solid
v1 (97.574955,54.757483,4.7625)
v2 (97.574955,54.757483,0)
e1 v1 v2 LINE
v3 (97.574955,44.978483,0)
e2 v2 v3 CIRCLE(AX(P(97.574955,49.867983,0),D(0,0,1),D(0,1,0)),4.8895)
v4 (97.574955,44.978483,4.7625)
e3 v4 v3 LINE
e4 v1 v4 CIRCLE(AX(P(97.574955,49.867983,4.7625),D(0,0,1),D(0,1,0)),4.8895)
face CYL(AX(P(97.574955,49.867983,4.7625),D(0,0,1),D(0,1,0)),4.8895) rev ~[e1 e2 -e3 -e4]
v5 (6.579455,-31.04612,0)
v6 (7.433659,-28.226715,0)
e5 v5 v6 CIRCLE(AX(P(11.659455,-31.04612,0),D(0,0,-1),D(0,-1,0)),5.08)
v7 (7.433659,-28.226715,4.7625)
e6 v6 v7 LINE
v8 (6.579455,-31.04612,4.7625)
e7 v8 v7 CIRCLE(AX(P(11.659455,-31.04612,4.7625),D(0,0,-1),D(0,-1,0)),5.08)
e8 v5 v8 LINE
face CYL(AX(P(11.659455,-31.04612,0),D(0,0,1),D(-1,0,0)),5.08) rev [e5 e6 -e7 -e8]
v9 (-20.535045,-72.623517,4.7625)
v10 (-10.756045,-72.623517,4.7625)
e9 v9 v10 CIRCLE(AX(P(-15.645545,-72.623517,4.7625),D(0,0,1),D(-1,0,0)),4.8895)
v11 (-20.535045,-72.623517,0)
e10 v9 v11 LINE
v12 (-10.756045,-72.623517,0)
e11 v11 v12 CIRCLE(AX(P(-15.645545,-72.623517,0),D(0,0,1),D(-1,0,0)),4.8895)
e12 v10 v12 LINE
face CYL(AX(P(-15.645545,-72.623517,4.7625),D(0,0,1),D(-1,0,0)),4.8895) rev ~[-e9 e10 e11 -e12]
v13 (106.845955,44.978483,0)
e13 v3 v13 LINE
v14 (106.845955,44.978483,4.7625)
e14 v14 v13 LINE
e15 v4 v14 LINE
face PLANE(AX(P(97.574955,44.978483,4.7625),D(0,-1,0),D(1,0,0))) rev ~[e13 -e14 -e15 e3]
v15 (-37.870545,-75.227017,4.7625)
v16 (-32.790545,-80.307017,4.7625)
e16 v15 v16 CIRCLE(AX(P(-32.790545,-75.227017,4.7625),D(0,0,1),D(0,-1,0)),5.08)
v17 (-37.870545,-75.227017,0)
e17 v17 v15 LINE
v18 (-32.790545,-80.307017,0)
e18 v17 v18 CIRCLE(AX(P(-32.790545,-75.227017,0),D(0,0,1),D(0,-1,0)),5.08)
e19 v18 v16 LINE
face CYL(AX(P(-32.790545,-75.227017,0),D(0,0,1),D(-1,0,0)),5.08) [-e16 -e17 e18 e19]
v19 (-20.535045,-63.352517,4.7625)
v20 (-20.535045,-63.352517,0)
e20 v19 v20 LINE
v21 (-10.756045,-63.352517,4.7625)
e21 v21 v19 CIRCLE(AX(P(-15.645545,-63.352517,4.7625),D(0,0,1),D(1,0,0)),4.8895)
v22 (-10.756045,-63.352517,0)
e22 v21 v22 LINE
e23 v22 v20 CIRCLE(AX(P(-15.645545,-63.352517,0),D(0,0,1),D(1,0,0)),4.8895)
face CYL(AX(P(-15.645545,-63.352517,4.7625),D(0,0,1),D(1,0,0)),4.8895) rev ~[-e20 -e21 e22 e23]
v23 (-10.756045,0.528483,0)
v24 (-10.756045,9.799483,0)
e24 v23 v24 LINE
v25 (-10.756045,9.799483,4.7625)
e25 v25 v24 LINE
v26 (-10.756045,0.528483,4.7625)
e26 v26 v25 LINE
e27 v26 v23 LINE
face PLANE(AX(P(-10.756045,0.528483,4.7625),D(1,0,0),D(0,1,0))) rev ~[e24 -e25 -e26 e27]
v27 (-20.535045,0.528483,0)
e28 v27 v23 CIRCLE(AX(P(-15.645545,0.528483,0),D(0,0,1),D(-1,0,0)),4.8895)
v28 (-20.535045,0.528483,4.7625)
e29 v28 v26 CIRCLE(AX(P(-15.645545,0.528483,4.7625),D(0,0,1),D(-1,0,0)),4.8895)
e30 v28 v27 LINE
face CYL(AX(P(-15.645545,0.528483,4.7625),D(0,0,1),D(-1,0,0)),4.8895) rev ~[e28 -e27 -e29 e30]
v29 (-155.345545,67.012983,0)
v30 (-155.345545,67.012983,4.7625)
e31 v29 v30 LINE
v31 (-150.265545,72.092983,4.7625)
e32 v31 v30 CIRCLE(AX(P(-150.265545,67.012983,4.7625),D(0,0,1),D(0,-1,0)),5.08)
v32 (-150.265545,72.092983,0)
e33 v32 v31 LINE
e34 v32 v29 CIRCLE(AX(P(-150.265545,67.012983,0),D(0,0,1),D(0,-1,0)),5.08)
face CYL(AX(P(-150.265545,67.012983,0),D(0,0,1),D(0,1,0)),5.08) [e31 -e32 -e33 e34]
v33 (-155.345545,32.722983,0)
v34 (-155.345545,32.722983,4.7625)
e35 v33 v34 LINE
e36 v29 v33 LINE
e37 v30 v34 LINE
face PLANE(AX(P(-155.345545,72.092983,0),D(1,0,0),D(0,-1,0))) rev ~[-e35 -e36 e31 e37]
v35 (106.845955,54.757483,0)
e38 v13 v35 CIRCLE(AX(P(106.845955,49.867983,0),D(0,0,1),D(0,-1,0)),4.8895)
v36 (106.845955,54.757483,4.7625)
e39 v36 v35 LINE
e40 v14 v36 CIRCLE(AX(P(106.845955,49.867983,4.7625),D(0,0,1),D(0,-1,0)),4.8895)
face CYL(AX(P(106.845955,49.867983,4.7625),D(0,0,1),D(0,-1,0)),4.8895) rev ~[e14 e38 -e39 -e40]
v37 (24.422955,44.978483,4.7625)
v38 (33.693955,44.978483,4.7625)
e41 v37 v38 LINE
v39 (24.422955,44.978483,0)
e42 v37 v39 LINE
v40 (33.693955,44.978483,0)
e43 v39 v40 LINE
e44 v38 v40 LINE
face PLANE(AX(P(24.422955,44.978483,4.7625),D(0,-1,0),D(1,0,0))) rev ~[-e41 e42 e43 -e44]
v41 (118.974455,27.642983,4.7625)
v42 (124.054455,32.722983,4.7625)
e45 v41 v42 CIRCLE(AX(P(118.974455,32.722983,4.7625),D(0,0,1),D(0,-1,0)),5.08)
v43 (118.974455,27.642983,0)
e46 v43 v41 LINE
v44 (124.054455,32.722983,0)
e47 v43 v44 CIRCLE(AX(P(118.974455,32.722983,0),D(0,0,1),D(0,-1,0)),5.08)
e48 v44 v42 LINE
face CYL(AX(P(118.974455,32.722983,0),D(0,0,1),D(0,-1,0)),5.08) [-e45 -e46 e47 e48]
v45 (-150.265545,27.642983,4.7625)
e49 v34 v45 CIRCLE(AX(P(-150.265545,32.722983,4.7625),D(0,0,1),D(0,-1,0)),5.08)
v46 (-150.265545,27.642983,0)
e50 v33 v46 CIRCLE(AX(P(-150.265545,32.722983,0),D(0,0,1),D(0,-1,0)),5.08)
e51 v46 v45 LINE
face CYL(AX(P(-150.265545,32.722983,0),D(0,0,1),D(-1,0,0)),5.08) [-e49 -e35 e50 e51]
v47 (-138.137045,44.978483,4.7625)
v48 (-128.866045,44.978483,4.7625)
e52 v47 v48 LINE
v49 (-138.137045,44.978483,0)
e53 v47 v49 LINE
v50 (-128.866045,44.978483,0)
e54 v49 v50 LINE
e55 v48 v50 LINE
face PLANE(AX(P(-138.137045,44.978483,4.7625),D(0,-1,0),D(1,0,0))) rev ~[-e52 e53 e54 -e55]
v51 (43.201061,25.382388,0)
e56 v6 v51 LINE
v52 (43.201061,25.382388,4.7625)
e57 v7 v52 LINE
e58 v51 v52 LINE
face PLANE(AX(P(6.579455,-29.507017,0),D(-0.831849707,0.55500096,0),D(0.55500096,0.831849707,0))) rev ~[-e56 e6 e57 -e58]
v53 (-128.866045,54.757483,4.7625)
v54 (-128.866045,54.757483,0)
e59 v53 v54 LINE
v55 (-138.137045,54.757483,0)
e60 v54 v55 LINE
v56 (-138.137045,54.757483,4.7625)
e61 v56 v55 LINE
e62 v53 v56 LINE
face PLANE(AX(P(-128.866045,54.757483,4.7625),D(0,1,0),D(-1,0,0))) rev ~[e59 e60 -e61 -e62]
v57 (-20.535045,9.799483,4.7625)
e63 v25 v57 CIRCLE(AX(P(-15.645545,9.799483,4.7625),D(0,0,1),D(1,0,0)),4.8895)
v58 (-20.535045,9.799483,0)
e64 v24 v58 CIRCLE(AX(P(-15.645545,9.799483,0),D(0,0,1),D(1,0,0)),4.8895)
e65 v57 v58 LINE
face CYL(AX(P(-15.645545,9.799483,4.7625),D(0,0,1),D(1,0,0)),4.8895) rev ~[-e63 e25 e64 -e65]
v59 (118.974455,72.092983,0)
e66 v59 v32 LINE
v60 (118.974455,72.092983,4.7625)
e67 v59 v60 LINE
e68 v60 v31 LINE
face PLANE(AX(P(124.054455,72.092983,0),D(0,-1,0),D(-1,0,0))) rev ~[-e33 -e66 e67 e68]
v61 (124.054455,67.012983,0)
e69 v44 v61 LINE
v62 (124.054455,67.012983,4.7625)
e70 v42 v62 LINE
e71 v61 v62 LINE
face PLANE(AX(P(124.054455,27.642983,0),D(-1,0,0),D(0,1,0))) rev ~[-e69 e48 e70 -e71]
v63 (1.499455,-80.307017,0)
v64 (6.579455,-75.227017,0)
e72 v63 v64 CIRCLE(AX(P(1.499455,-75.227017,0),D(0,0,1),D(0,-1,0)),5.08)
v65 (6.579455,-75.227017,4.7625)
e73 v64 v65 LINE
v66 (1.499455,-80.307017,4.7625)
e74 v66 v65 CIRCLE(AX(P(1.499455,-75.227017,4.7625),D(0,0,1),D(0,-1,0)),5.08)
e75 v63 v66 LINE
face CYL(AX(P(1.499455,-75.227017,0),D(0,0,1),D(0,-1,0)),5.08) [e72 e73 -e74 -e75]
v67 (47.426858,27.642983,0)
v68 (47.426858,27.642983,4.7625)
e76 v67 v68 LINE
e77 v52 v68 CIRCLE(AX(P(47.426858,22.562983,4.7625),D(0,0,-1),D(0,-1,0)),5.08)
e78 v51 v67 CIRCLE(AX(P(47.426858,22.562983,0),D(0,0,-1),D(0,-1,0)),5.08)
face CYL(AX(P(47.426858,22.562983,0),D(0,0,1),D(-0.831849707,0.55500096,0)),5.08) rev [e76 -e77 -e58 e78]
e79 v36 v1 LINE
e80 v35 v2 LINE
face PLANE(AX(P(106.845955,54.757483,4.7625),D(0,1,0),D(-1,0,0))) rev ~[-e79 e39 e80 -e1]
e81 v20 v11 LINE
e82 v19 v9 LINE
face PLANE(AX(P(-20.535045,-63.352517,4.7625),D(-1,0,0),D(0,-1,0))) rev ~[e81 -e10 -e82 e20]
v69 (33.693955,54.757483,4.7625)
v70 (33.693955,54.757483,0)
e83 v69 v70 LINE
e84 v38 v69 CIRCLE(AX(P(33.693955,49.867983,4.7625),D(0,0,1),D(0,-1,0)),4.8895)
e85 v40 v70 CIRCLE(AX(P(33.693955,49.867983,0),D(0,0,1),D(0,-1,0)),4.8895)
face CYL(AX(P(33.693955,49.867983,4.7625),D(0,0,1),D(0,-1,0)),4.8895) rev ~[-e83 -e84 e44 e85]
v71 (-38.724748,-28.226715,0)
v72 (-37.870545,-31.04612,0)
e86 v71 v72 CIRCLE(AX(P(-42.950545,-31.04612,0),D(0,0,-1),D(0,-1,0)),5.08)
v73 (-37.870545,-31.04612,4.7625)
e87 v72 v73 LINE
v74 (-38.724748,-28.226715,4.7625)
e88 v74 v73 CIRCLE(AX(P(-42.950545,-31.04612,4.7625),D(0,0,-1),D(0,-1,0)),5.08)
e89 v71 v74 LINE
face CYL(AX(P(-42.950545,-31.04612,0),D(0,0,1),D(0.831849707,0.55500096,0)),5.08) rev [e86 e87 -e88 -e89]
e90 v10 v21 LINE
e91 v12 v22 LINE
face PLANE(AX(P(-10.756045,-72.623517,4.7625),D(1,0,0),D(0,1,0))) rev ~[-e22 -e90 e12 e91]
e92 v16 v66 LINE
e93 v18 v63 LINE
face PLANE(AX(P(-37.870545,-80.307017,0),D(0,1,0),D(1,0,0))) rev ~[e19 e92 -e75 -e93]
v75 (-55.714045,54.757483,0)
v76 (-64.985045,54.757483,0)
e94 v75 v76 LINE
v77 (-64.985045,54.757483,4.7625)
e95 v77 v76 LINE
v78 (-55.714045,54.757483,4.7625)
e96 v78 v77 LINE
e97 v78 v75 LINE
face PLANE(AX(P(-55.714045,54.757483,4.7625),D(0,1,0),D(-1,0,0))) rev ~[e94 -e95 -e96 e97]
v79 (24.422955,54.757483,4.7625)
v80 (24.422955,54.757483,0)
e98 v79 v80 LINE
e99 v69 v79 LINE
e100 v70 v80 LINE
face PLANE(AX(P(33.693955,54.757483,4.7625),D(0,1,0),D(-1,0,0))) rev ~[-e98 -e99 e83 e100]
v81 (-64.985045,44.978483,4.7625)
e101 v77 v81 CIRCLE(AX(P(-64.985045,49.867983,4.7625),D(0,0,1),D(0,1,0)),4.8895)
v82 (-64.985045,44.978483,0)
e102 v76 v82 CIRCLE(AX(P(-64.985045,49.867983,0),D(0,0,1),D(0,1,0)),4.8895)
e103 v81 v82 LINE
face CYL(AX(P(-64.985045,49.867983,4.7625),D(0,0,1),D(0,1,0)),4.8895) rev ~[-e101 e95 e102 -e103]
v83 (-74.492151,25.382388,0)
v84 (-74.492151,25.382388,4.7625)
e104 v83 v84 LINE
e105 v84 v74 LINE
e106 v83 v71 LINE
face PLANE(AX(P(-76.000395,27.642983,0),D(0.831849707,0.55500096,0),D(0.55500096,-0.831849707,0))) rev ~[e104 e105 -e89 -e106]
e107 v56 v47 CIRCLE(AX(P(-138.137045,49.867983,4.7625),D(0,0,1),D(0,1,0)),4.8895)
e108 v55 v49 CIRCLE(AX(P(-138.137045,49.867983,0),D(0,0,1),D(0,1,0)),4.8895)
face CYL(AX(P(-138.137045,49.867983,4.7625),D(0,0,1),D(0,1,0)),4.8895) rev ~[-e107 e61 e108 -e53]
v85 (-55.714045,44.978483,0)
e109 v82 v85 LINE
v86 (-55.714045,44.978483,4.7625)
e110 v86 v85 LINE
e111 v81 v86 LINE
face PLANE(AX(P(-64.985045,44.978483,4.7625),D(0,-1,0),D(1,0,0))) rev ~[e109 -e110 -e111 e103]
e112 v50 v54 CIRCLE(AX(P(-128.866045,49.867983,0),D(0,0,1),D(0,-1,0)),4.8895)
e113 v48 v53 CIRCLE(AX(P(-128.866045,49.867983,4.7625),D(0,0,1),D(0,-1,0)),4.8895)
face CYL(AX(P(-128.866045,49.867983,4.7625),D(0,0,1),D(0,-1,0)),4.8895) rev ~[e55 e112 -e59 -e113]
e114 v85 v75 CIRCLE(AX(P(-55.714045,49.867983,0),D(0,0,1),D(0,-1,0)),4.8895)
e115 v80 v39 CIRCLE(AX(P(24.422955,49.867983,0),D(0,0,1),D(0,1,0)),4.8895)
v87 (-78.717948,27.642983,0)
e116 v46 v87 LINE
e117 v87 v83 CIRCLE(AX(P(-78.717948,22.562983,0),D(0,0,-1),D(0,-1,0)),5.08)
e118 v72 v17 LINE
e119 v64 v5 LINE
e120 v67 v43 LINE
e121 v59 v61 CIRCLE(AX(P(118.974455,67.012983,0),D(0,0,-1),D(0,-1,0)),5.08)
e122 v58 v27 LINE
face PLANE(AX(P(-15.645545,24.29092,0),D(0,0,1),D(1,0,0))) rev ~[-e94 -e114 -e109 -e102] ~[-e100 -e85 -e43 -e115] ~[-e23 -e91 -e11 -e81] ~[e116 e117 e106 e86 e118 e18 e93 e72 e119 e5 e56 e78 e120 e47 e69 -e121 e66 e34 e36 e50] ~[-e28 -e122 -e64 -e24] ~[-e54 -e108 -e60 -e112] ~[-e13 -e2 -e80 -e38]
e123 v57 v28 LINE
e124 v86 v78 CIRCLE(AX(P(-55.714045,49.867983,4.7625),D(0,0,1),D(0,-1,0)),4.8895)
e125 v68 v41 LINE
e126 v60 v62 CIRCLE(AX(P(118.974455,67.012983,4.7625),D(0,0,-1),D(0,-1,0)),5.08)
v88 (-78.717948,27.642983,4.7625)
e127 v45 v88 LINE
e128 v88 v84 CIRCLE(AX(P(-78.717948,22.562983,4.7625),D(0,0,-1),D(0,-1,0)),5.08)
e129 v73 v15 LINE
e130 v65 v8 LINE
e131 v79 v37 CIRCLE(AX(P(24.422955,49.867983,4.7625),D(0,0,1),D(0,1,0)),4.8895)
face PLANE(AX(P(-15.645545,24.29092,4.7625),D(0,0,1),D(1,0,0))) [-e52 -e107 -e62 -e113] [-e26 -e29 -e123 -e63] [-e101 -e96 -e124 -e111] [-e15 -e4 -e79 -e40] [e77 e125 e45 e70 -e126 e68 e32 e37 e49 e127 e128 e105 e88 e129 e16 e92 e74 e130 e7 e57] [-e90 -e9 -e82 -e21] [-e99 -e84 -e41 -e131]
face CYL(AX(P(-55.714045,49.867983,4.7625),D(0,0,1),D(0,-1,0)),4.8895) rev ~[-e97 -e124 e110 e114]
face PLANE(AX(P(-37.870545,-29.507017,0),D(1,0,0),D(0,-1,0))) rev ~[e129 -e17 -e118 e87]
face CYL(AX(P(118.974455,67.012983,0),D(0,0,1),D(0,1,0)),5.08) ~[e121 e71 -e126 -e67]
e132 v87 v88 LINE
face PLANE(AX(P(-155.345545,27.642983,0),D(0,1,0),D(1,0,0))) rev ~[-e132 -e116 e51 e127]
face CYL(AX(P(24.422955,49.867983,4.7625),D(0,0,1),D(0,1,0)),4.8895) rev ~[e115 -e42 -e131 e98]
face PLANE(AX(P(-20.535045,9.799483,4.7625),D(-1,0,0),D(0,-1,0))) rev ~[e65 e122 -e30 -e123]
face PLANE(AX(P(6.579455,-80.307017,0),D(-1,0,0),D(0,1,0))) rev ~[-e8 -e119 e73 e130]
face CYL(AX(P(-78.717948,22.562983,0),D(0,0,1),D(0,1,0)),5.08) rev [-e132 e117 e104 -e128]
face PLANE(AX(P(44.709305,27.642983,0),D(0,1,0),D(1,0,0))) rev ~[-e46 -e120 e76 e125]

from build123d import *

# Parameters (mm, degrees)
F1_DEPTH = 4.7625
F2_R     = 5.08
F4_DEPTH = 4.7635


# Not quite as in the source:
# - a length typed as a fraction of an inch, garbled in the dataset ("3 / 203.2 mm" for 3/8 in), is restored


with BuildPart() as f1:
    # F0 (on Top) → F1 (new body)
    with BuildSketch(Plane.XY):
        Polygon((124.0544550598, 72.092982788), (-155.3455449402, 72.092982788), (-155.3455449402, 27.642982788), (-76.0003953454, 27.642982788), (-37.8705449402, -29.507017212), (-37.8705449402, -80.307017212), (6.5794550598, -80.307017212), (6.5794550598, -29.507017212), (44.7093054649, 27.642982788), (124.0544550598, 27.642982788), align=None)
    extrude(amount=F1_DEPTH)

    # F2
    f2_edges = [f1.edges().sort_by_distance(p)[0] for p in [
        (-155.345545, 27.642983, 2.38125),
        (-155.345545, 72.092983, 2.38125),
        (-37.870545, -80.307017, 2.38125),
        (6.579455, -80.307017, 2.38125),
        (-76.000395, 27.642983, 2.38125),
        (-37.870545, -29.507017, 2.38125),
        (6.579455, -29.507017, 2.38125),
        (44.709305, 27.642983, 2.38125),
        (124.054455, 27.642983, 2.38125),
        (124.054455, 72.092983, 2.38125),
    ]]
    fillet(f2_edges, radius=F2_R)

    # F3 (on face) → F4 (cut, through all)
    with BuildSketch(Plane.XY.offset(4.7625)):
        with BuildLine():
            Line((106.8459550598, 54.757482788), (97.5749550598, 54.757482788))
            ThreePointArc((97.5749550598, 54.757482788), (92.6854550598, 49.867982788), (97.5749550598, 44.978482788))
            Line((97.5749550598, 44.978482788), (106.8459550598, 44.978482788))
            ThreePointArc((106.8459550598, 44.978482788), (111.7354550598, 49.867982788), (106.8459550598, 54.757482788))
        make_face()
        with BuildLine():
            Line((33.6939550598, 54.757482788), (24.4229550598, 54.757482788))
            ThreePointArc((24.4229550598, 54.757482788), (19.5334550598, 49.867982788), (24.4229550598, 44.978482788))
            Line((24.4229550598, 44.978482788), (33.6939550598, 44.978482788))
            ThreePointArc((33.6939550598, 44.978482788), (38.5834550598, 49.867982788), (33.6939550598, 54.757482788))
        make_face()
        with BuildLine():
            ThreePointArc((-10.7560449402, -63.352517212), (-15.6455449402, -58.463017212), (-20.5350449402, -63.352517212))
            Line((-20.5350449402, -63.352517212), (-20.5350449402, -72.623517212))
            ThreePointArc((-20.5350449402, -72.623517212), (-15.6455449402, -77.513017212), (-10.7560449402, -72.623517212))
            Line((-10.7560449402, -72.623517212), (-10.7560449402, -63.352517212))
        make_face()
        with BuildLine():
            Line((-10.7560449402, 0.528482788), (-10.7560449402, 9.799482788))
            ThreePointArc((-10.7560449402, 9.799482788), (-15.6455449402, 14.688982788), (-20.5350449402, 9.799482788))
            Line((-20.5350449402, 9.799482788), (-20.5350449402, 0.528482788))
            ThreePointArc((-20.5350449402, 0.528482788), (-15.6455449402, -4.361017212), (-10.7560449402, 0.528482788))
        make_face()
        with BuildLine():
            Line((-128.8660449402, 54.757482788), (-138.1370449402, 54.757482788))
            ThreePointArc((-138.1370449402, 54.757482788), (-143.0265449402, 49.867982788), (-138.1370449402, 44.978482788))
            Line((-138.1370449402, 44.978482788), (-128.8660449402, 44.978482788))
            ThreePointArc((-128.8660449402, 44.978482788), (-123.9765449402, 49.867982788), (-128.8660449402, 54.757482788))
        make_face()
        with BuildLine():
            Line((-55.7140449402, 54.757482788), (-64.9850449402, 54.757482788))
            ThreePointArc((-64.9850449402, 54.757482788), (-69.8745449402, 49.867982788), (-64.9850449402, 44.978482788))
            Line((-64.9850449402, 44.978482788), (-55.7140449402, 44.978482788))
            ThreePointArc((-55.7140449402, 44.978482788), (-50.8245449402, 49.867982788), (-55.7140449402, 54.757482788))
        make_face()
    extrude(amount=-F4_DEPTH, mode=Mode.SUBTRACT)


solid = f1.part
